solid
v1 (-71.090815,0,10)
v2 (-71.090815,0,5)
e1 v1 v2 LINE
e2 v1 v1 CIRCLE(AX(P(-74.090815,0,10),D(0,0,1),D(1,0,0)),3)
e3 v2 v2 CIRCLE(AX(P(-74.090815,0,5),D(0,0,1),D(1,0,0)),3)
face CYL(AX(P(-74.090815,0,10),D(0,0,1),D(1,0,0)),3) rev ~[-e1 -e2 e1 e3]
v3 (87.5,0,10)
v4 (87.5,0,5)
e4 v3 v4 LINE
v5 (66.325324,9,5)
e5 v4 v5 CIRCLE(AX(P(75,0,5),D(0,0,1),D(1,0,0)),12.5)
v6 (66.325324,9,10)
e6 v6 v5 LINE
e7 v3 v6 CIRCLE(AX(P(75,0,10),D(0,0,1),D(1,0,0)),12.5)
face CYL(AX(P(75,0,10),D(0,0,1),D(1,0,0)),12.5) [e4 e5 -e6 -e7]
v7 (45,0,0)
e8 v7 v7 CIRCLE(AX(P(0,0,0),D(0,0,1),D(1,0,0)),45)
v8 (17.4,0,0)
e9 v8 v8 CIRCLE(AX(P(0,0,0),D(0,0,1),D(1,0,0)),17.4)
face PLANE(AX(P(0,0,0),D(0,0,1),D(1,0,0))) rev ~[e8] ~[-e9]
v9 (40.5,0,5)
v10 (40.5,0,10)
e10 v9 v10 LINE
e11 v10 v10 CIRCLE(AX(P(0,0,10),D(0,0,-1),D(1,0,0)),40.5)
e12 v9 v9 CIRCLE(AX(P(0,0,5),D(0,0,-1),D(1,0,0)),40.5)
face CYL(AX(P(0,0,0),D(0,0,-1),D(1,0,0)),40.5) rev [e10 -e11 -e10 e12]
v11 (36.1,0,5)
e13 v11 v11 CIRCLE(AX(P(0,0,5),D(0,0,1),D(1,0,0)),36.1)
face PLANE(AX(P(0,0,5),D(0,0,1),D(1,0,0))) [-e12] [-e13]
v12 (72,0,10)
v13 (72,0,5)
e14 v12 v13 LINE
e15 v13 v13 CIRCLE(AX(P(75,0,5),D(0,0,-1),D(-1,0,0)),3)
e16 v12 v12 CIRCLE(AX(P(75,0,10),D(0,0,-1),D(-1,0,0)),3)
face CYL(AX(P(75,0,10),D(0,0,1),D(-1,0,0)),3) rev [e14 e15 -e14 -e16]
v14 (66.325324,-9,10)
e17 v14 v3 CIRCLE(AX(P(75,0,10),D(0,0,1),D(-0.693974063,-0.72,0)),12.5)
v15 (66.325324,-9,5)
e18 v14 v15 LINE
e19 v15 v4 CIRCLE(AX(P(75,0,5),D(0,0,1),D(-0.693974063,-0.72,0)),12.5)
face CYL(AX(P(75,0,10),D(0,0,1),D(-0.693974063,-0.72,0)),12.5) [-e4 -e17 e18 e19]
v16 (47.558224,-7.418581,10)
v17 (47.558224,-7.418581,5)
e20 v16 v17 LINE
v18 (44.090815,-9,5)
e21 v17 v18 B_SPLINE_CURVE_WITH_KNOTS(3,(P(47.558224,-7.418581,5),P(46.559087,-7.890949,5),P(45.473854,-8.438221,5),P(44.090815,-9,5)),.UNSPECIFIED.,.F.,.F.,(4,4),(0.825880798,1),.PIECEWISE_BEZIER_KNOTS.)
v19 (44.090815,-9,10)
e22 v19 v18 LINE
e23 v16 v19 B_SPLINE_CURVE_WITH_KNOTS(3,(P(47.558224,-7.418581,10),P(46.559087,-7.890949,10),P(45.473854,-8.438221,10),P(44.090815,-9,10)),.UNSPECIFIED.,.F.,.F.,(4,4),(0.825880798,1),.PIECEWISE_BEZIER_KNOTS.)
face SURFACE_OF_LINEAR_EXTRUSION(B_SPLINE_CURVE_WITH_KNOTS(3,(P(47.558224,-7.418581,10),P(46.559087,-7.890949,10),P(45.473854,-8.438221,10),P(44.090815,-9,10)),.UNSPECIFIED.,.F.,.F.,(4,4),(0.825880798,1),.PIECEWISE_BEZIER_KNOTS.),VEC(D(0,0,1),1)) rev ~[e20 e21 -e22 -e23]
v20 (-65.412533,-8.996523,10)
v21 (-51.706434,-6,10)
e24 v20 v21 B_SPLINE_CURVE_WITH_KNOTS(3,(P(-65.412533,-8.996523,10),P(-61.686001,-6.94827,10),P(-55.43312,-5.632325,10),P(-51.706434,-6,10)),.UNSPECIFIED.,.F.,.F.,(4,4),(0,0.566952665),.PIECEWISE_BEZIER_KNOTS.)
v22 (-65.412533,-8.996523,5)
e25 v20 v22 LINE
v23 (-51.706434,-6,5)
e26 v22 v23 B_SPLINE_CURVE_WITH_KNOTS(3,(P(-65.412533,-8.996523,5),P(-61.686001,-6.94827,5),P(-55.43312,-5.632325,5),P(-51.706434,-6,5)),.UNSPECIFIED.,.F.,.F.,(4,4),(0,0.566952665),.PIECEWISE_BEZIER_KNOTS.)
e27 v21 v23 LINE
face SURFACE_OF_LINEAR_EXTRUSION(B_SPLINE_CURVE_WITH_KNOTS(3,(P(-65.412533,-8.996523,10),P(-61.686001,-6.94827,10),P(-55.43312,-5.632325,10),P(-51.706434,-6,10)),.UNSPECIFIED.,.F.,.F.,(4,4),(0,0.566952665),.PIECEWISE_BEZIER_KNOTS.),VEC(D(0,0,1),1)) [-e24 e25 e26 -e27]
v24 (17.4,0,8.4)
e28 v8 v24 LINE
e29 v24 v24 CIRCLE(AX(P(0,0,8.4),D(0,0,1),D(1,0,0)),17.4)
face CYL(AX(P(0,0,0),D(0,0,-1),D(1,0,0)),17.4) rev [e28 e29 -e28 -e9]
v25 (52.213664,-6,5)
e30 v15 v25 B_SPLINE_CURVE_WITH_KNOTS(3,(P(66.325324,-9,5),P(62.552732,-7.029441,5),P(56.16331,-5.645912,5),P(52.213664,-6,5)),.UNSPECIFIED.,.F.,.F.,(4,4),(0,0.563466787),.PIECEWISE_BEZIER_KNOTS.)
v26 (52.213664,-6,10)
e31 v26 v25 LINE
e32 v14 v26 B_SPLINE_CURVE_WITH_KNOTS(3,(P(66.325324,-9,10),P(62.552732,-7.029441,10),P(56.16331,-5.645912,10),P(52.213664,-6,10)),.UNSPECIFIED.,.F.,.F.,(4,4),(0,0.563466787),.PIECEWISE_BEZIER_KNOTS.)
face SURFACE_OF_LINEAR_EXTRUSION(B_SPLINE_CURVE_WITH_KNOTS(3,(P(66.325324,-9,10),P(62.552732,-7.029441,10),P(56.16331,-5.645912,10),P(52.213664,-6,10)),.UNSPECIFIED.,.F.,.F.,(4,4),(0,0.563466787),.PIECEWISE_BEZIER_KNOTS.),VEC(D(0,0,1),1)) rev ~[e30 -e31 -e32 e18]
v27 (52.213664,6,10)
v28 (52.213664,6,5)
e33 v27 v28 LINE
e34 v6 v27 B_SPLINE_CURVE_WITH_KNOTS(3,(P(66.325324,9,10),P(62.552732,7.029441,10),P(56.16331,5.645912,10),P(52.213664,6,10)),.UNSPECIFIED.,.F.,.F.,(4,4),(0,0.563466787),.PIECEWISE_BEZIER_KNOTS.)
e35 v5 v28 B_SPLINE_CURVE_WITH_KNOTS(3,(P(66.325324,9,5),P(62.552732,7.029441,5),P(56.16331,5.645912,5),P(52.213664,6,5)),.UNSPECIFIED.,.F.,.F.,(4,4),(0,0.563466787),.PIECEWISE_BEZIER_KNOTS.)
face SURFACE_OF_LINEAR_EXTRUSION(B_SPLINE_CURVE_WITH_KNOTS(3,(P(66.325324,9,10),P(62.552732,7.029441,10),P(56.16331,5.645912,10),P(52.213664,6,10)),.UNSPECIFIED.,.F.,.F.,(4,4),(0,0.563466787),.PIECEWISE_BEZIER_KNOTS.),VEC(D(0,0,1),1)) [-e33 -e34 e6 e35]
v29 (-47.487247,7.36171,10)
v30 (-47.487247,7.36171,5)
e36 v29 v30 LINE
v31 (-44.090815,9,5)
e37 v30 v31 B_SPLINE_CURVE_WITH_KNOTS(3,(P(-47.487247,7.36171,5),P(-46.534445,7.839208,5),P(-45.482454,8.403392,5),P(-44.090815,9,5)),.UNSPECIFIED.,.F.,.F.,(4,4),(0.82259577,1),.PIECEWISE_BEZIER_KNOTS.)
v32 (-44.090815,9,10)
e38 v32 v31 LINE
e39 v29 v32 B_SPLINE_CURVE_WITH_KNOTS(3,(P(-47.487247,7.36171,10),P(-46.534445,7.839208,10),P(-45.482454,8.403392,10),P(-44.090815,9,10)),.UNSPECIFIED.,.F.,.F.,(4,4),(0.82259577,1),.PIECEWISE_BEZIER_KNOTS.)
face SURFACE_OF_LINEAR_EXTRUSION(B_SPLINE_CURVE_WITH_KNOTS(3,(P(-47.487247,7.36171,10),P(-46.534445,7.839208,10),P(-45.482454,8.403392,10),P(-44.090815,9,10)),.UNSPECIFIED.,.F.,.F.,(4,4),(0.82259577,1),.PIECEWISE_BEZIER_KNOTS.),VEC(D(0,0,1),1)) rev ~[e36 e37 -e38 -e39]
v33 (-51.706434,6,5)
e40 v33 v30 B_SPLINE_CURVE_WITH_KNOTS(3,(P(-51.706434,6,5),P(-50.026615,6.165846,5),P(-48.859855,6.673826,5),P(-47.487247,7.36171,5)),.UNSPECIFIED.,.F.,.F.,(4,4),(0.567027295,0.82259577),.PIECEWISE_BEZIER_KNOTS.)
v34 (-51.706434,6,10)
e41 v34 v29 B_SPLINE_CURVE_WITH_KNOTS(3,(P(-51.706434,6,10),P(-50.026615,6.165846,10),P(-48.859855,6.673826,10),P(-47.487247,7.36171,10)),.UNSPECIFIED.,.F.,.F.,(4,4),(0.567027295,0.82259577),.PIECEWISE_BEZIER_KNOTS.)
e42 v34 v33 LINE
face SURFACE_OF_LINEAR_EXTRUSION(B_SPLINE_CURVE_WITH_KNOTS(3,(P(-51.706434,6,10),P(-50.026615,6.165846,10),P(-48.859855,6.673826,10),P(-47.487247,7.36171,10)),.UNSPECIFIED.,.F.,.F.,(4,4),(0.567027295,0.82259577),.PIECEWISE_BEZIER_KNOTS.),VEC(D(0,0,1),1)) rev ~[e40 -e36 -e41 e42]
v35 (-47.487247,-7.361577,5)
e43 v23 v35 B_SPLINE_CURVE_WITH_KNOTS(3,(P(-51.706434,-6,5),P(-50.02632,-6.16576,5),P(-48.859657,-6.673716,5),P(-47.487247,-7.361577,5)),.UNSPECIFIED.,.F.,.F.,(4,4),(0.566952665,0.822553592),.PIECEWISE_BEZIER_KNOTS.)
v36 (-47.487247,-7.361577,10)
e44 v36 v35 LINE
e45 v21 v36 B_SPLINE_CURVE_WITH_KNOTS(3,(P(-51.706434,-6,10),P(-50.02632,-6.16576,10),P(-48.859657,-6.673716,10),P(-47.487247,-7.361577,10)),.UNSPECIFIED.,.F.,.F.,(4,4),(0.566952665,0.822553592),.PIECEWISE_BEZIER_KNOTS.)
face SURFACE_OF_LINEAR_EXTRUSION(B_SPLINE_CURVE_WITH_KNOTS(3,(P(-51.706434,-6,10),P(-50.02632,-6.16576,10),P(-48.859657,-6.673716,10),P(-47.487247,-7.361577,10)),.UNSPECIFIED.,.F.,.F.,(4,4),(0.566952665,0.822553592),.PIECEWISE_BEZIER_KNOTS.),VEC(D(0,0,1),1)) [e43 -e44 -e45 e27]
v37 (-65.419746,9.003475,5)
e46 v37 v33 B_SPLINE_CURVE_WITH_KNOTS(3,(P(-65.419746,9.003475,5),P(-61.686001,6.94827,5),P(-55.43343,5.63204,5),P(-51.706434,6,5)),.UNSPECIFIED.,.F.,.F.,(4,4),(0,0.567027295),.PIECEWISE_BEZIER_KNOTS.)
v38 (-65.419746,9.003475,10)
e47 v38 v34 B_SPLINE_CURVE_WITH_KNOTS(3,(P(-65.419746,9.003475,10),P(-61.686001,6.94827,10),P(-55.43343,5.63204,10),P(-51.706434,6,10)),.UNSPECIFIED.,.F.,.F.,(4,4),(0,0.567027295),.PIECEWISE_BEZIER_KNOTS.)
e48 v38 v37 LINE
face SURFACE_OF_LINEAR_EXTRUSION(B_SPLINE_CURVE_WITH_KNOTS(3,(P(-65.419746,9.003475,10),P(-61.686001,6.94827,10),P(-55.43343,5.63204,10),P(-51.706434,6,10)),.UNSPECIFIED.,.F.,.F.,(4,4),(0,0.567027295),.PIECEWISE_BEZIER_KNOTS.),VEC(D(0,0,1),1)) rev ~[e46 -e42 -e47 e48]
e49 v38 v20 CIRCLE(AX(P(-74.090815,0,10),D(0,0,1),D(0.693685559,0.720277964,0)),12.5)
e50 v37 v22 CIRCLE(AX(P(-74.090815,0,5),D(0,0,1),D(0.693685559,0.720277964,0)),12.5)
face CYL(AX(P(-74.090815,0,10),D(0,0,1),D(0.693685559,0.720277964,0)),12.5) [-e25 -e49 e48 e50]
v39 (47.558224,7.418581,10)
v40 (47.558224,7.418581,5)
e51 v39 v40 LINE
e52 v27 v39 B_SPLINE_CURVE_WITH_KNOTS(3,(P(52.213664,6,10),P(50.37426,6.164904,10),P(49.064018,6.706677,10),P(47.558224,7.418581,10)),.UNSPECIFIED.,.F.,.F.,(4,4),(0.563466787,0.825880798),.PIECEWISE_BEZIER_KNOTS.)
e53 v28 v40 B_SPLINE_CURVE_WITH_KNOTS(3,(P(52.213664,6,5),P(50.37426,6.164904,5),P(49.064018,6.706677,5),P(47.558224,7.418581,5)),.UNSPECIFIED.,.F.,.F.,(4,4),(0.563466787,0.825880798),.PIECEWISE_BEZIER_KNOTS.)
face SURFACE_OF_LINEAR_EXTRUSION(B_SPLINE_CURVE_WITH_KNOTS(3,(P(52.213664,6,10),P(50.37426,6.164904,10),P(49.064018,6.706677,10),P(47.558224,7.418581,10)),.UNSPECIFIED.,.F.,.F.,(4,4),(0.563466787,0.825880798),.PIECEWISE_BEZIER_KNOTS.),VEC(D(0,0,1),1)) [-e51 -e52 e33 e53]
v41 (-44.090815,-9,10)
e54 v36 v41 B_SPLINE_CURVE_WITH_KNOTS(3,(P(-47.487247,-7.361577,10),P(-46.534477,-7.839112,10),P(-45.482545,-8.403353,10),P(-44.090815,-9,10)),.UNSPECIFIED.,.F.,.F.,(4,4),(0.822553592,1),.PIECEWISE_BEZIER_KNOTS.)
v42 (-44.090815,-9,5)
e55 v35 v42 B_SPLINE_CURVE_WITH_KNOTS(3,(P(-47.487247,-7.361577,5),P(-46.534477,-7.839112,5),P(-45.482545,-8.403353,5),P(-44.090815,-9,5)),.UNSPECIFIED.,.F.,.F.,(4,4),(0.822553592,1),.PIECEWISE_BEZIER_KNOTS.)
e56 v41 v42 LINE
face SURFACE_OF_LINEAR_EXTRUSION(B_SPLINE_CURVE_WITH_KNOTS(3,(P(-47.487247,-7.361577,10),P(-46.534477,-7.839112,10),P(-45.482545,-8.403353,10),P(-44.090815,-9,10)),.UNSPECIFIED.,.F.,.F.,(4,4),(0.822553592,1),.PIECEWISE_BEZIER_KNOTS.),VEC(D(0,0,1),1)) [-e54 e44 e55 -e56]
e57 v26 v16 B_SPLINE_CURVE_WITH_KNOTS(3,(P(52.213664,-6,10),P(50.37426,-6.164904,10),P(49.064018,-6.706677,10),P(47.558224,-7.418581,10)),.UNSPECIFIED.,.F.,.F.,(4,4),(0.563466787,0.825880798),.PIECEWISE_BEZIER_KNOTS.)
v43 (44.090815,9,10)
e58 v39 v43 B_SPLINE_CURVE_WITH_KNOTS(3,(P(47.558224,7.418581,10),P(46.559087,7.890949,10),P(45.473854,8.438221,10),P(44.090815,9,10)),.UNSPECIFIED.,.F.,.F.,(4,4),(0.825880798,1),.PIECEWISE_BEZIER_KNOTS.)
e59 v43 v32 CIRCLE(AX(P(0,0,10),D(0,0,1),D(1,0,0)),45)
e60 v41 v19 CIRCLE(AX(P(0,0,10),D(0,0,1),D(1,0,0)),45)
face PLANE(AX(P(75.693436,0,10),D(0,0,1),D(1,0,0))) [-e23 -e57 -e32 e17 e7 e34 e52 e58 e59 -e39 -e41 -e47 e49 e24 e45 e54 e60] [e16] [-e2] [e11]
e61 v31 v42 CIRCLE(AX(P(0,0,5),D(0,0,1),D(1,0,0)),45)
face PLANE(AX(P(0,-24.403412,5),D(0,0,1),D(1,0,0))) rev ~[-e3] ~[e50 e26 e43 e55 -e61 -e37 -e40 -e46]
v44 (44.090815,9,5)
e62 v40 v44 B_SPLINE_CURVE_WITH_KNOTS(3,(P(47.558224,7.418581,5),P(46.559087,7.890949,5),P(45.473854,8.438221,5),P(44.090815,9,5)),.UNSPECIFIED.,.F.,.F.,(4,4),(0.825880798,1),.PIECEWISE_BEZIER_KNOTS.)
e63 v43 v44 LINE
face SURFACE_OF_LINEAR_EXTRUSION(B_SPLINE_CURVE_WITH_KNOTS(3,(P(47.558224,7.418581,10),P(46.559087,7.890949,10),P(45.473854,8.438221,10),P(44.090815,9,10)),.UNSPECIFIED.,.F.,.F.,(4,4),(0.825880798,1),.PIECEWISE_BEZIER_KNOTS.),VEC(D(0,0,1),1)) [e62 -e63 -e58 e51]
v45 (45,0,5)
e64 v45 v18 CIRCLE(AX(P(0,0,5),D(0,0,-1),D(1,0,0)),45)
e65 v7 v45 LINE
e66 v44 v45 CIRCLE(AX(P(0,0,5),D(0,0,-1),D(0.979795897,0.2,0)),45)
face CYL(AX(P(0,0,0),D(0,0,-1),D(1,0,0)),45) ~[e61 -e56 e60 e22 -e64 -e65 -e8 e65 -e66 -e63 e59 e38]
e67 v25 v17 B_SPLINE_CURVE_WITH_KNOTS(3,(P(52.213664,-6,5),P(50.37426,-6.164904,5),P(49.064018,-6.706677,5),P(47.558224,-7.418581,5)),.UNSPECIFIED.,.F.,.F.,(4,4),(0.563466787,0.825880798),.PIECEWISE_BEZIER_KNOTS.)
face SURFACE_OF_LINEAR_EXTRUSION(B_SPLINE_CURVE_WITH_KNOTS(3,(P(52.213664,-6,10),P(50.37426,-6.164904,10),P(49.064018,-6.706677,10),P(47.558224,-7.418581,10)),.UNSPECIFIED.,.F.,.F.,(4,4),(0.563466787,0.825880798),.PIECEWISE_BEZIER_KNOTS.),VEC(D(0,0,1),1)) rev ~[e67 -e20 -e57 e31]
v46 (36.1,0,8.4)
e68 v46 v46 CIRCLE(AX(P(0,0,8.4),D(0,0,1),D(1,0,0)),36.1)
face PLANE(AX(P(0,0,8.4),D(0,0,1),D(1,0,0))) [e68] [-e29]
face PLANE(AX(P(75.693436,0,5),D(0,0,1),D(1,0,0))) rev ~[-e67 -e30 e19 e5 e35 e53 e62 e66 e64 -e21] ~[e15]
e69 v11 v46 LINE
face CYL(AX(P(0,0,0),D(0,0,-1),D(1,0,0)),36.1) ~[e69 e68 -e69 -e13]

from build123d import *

# Parameters (mm, degrees)
F0_R        = 45
F0_R_2      = 40.5
F1_DEPTH    = 10
F0_R_3      = 36.1
F2_DEPTH    = 5
F0_R_4      = 31
F3_DEPTH    = 8.4
F0_R_5      = 17.4
F4_DEPTH    = 8.4
F5_R        = 3
F1_FACE_R   = 45
F1_FACE_R_2 = 40.5
F6_DEPTH    = 5


with BuildPart() as f1:
    # F0 (on Top) → F1 (new body)
    with BuildSketch(Plane.XY):
        Circle(F0_R)
        Circle(F0_R_2, mode=Mode.SUBTRACT)
    extrude(amount=F1_DEPTH)

    # F0 (on Top) → F2 (join)
    with BuildSketch(Plane.XY):
        Circle(F0_R_2)
        Circle(F0_R_3, mode=Mode.SUBTRACT)
    extrude(amount=F2_DEPTH)

    # F0 (on Top) → F3 (join)
    with BuildSketch(Plane.XY):
        Circle(F0_R_3)
        Circle(F0_R_4, mode=Mode.SUBTRACT)
    extrude(amount=F3_DEPTH)

    # F0 (on Top) → F4 (join)
    with BuildSketch(Plane.XY):
        Circle(F0_R_4)
        Circle(F0_R_5, mode=Mode.SUBTRACT)
    extrude(amount=F4_DEPTH)

    # F5 (on face) + F1_face (on face) → F6 (join)
    with BuildSketch(Plane.XY.offset(10)):
        with BuildLine():
            ThreePointArc((66.3253242136, -9), (79.8896090165, -11.5039872942), (87.5, 0))
            ThreePointArc((87.5, 0), (79.8896090165, 11.5039872942), (66.3253242136, 9))
            Line((66.3253242136, 9), (66.3253242136, 0))
            Line((66.3253242136, 0), (66.3253242136, -9))
        make_face()
        with BuildLine():
            ThreePointArc((78, 0), (75, -3), (72, 0))
            ThreePointArc((72, 0), (75, 3), (78, 0))
        make_face(mode=Mode.SUBTRACT)
        with BuildLine():
            ThreePointArc((62.5527321378, -1.1469624085), (63.7327165773, -5.4127926501), (66.3253242136, -9))
            Line((66.3253242136, -9), (66.3253242136, 0))
            Line((66.3253242136, 0), (62.5527321378, 0))
            Line((62.5527321378, 0), (62.5527321378, -1.1469624085))
        make_face()
        with BuildLine():
            Line((66.3253242136, 0), (66.3253242136, 9))
            ThreePointArc((66.3253242136, 9), (63.7327165773, 5.4127926501), (62.5527321378, 1.1469624085))
            Line((62.5527321378, 1.1469624085), (62.5527321378, 0))
            Line((62.5527321378, 0), (66.3253242136, 0))
        make_face()
        with BuildLine():
            ThreePointArc((62.5527321378, 1.1469624085), (63.7327165773, 5.4127926501), (66.3253242136, 9))
            add(Edge.make_bspline(
                [(66.3253242136, 9), (62.5527321378, 7.0294414229), (56.1633100825, 5.6459116487), (52.2136635361, 6)],
                knots=[0, 0, 0, 0, 0.5634667873, 0.5634667873, 0.5634667873, 0.5634667873], degree=3))
            Line((52.2136635361, 6), (52.2136635361, 0))
            Line((52.2136635361, 0), (62.5, 0))
            ThreePointArc((62.5, 0), (62.5131899935, 0.5740869806), (62.5527321378, 1.1469624085))
        make_face()
        with BuildLine():
            add(Edge.make_bspline(
                [(52.2136635361, -6), (50.3742603721, -6.1649036758), (49.0640175166, -6.7066774941), (47.5582238129, -7.4185810788)],
                knots=[0.5634667873, 0.5634667873, 0.5634667873, 0.5634667873, 0.8258807981, 0.8258807981, 0.8258807981, 0.8258807981], degree=3))
            Line((52.2136635361, -6), (52.2136635361, 0))
            Line((52.2136635361, 0), (47.5582238129, 0))
            Line((47.5582238129, 0), (47.5582238129, -7.4185810788))
        make_face()
        with BuildLine():
            Line((62.5527321378, 0), (62.5527321378, 1.1469624085))
            ThreePointArc((62.5527321378, 1.1469624085), (62.5131899935, 0.5740869806), (62.5, 0))
            Line((62.5, 0), (62.5527321378, 0))
        make_face()
        with BuildLine():
            ThreePointArc((62.5, 0), (62.5131899935, -0.5740869806), (62.5527321378, -1.1469624085))
            Line((62.5527321378, -1.1469624085), (62.5527321378, 0))
            Line((62.5527321378, 0), (62.5, 0))
        make_face()
        with BuildLine():
            add(Edge.make_bspline(
                [(66.3253242136, -9), (62.5527321378, -7.0294414229), (56.1633100825, -5.6459116487), (52.2136635361, -6)],
                knots=[0, 0, 0, 0, 0.5634667873, 0.5634667873, 0.5634667873, 0.5634667873], degree=3))
            ThreePointArc((66.3253242136, -9), (63.7327165773, -5.4127926501), (62.5527321378, -1.1469624085))
            ThreePointArc((62.5527321378, -1.1469624085), (62.5131899935, -0.5740869806), (62.5, 0))
            Line((62.5, 0), (52.2136635361, 0))
            Line((52.2136635361, 0), (52.2136635361, -6))
        make_face()
        with BuildLine():
            Line((52.2136635361, 0), (52.2136635361, 6))
            add(Edge.make_bspline(
                [(52.2136635361, 6), (50.3742603721, 6.1649036758), (49.0640175166, 6.7066774941), (47.5582238129, 7.4185810788)],
                knots=[0.5634667873, 0.5634667873, 0.5634667873, 0.5634667873, 0.8258807981, 0.8258807981, 0.8258807981, 0.8258807981], degree=3))
            Line((47.5582238129, 7.4185810788), (47.5582238129, 0))
            Line((47.5582238129, 0), (52.2136635361, 0))
        make_face()
        with BuildLine():
            add(Edge.make_bspline(
                [(47.5582238129, -7.4185810788), (46.5590866207, -7.8909494696), (45.4738542162, -8.4382209279), (44.0908153701, -9)],
                knots=[0.8258807981, 0.8258807981, 0.8258807981, 0.8258807981, 1, 1, 1, 1], degree=3))
            Line((47.5582238129, -7.4185810788), (47.5582238129, 0))
            Line((47.5582238129, 0), (45, 0))
            ThreePointArc((45, 0), (44.7721268852, -4.5229032902), (44.0908153701, -9))
        make_face()
        with BuildLine():
            Line((47.5582238129, 0), (47.5582238129, 7.4185810788))
            add(Edge.make_bspline(
                [(47.5582238129, 7.4185810788), (46.5590866207, 7.8909494696), (45.4738542162, 8.4382209279), (44.0908153701, 9)],
                knots=[0.8258807981, 0.8258807981, 0.8258807981, 0.8258807981, 1, 1, 1, 1], degree=3))
            ThreePointArc((44.0908153701, 9), (44.7721268852, 4.5229032902), (45, 0))
            Line((45, 0), (47.5582238129, 0))
        make_face()
        with BuildLine():
            ThreePointArc((-44.0908153701, -9), (0, -45), (44.0908153701, -9))
            Line((44.0908153701, -9), (44.0908153701, 0))
            Line((44.0908153701, 0), (40.5, 0))
            ThreePointArc((40.5, 0), (0, -40.5), (-40.5, 0))
            Line((-40.5, 0), (-44.0908153701, 0))
            Line((-44.0908153701, 0), (-44.0908153701, -9))
        make_face()
        with BuildLine():
            Line((-51.7064335188, 0), (-51.7064335188, 6))
            add(Edge.make_bspline(
                [(-65.4197458811, 9.0034745469), (-61.6860010238, 6.9482695309), (-55.4334302889, 5.6320399313), (-51.7064335188, 6)],
                knots=[0, 0, 0, 0, 0.567027295, 0.567027295, 0.567027295, 0.567027295], degree=3))
            ThreePointArc((-65.4197458811, 9.0034745469), (-62.911579364, 5.5923771619), (-61.6860010238, 1.5396691315))
            ThreePointArc((-61.6860010238, 1.5396691315), (-61.6146344775, 0.7713043082), (-61.5908153701, 0))
            Line((-61.5908153701, 0), (-51.7064335188, 0))
        make_face()
        with BuildLine():
            ThreePointArc((-45, 0), (-44.7721268852, -4.5229032902), (-44.0908153701, -9))
            Line((-44.0908153701, -9), (-44.0908153701, 0))
            Line((-44.0908153701, 0), (-45, 0))
        make_face()
        with BuildLine():
            add(Edge.make_bspline(
                [(-65.4125331798, -8.996522563), (-61.6860010238, -6.9482695309), (-55.4331204309, -5.6323249689), (-51.7064335188, -6)],
                knots=[0, 0, 0, 0, 0.566952665, 0.566952665, 0.566952665, 0.566952665], degree=3))
            Line((-51.7064335188, -6), (-51.7064335188, 0))
            Line((-51.7064335188, 0), (-61.5908153701, 0))
            ThreePointArc((-61.5908153701, 0), (-61.6146344775, -0.7713043082), (-61.6860010238, -1.5396691315))
            ThreePointArc((-61.6860010238, -1.5396691315), (-62.9093393644, -5.5878971298), (-65.4125331798, -8.996522563))
        make_face()
        with BuildLine():
            add(Edge.make_bspline(
                [(-51.7064335188, -6), (-50.0263203675, -6.1657600088), (-48.8596569, -6.6737162451), (-47.4872474781, -7.3615768954)],
                knots=[0.566952665, 0.566952665, 0.566952665, 0.566952665, 0.8225535918, 0.8225535918, 0.8225535918, 0.8225535918], degree=3))
            Line((-47.4872474781, -7.3615768954), (-47.4872474781, 0))
            Line((-47.4872474781, 0), (-51.7064335188, 0))
            Line((-51.7064335188, 0), (-51.7064335188, -6))
        make_face()
        with BuildLine():
            ThreePointArc((-61.6860010238, 1.5396691315), (-62.911579364, 5.5923771619), (-65.4197458811, 9.0034745469))
            Line((-65.4197458811, 9.0034745469), (-65.4197458811, 0.0034745469))
            Line((-65.4197458811, 0.0034745469), (-65.4197430965, 0))
            Line((-65.4197430965, 0), (-61.6860010238, 0))
            Line((-61.6860010238, 0), (-61.6860010238, 1.5396691315))
        make_face()
        with BuildLine():
            Line((-65.4197430965, 0), (-65.4125331798, -8.996522563))
            ThreePointArc((-65.4125331798, -8.996522563), (-62.9093393644, -5.5878971298), (-61.6860010238, -1.5396691315))
            Line((-61.6860010238, -1.5396691315), (-61.6860010238, 0))
            Line((-61.6860010238, 0), (-65.4197430965, 0))
        make_face()
        with BuildLine():
            add(Edge.make_bspline(
                [(-47.4872474781, -7.3615768954), (-46.5344765882, -7.8391119468), (-45.482544702, -8.4033534464), (-44.0908153701, -9)],
                knots=[0.8225535918, 0.8225535918, 0.8225535918, 0.8225535918, 1, 1, 1, 1], degree=3))
            ThreePointArc((-44.0908153701, -9), (-44.7721268852, -4.5229032902), (-45, 0))
            Line((-45, 0), (-47.4872474781, 0))
            Line((-47.4872474781, 0), (-47.4872474781, -7.3615768954))
        make_face()
        with BuildLine():
            ThreePointArc((-45, 0), (-44.7721268852, 4.5229032902), (-44.0908153701, 9))
            add(Edge.make_bspline(
                [(-47.4872474781, 7.3617098784), (-46.5344445734, 7.8392079283), (-45.4824537219, 8.4033924504), (-44.0908153701, 9)],
                knots=[0.8225957704, 0.8225957704, 0.8225957704, 0.8225957704, 1, 1, 1, 1], degree=3))
            Line((-47.4872474781, 7.3617098784), (-47.4872474781, 0))
            Line((-47.4872474781, 0), (-45, 0))
        make_face()
        with BuildLine():
            Line((-44.0908153701, 0), (-44.0908153701, 9))
            ThreePointArc((-44.0908153701, 9), (-44.7721268852, 4.5229032902), (-45, 0))
            Line((-45, 0), (-44.0908153701, 0))
        make_face()
        with BuildLine():
            ThreePointArc((-61.6860010238, -1.5396691315), (-61.6146344775, -0.7713043082), (-61.5908153701, 0))
            Line((-61.5908153701, 0), (-61.6860010238, 0))
            Line((-61.6860010238, 0), (-61.6860010238, -1.5396691315))
        make_face()
        with BuildLine():
            ThreePointArc((-61.5908153701, 0), (-61.6146344775, 0.7713043082), (-61.6860010238, 1.5396691315))
            Line((-61.6860010238, 1.5396691315), (-61.6860010238, 0))
            Line((-61.6860010238, 0), (-61.5908153701, 0))
        make_face()
        with BuildLine():
            Line((-47.4872474781, 0), (-47.4872474781, 7.3617098784))
            add(Edge.make_bspline(
                [(-51.7064335188, 6), (-50.0266151205, 6.1658456208), (-48.8598550323, 6.6738263432), (-47.4872474781, 7.3617098784)],
                knots=[0.567027295, 0.567027295, 0.567027295, 0.567027295, 0.8225957704, 0.8225957704, 0.8225957704, 0.8225957704], degree=3))
            Line((-51.7064335188, 6), (-51.7064335188, 0))
            Line((-51.7064335188, 0), (-47.4872474781, 0))
        make_face()
        with BuildLine():
            Line((-65.4197458811, 0.0034745469), (-65.4197458811, 9.0034745469))
            ThreePointArc((-65.4197458811, 9.0034745469), (-86.5908143666, -0.0050088207), (-65.4125331798, -8.996522563))
            Line((-65.4125331798, -8.996522563), (-65.4197430965, 0))
            Line((-65.4197430965, 0), (-65.4197458811, 0.0034745469))
        make_face()
        with Locations((-74.0908153701, 0)):
            Circle(F5_R, mode=Mode.SUBTRACT)
    with BuildSketch(Plane.XY.offset(10)):
        Circle(F1_FACE_R)
        Circle(F1_FACE_R_2, mode=Mode.SUBTRACT)
    extrude(amount=-F6_DEPTH)


solid = f1.part
